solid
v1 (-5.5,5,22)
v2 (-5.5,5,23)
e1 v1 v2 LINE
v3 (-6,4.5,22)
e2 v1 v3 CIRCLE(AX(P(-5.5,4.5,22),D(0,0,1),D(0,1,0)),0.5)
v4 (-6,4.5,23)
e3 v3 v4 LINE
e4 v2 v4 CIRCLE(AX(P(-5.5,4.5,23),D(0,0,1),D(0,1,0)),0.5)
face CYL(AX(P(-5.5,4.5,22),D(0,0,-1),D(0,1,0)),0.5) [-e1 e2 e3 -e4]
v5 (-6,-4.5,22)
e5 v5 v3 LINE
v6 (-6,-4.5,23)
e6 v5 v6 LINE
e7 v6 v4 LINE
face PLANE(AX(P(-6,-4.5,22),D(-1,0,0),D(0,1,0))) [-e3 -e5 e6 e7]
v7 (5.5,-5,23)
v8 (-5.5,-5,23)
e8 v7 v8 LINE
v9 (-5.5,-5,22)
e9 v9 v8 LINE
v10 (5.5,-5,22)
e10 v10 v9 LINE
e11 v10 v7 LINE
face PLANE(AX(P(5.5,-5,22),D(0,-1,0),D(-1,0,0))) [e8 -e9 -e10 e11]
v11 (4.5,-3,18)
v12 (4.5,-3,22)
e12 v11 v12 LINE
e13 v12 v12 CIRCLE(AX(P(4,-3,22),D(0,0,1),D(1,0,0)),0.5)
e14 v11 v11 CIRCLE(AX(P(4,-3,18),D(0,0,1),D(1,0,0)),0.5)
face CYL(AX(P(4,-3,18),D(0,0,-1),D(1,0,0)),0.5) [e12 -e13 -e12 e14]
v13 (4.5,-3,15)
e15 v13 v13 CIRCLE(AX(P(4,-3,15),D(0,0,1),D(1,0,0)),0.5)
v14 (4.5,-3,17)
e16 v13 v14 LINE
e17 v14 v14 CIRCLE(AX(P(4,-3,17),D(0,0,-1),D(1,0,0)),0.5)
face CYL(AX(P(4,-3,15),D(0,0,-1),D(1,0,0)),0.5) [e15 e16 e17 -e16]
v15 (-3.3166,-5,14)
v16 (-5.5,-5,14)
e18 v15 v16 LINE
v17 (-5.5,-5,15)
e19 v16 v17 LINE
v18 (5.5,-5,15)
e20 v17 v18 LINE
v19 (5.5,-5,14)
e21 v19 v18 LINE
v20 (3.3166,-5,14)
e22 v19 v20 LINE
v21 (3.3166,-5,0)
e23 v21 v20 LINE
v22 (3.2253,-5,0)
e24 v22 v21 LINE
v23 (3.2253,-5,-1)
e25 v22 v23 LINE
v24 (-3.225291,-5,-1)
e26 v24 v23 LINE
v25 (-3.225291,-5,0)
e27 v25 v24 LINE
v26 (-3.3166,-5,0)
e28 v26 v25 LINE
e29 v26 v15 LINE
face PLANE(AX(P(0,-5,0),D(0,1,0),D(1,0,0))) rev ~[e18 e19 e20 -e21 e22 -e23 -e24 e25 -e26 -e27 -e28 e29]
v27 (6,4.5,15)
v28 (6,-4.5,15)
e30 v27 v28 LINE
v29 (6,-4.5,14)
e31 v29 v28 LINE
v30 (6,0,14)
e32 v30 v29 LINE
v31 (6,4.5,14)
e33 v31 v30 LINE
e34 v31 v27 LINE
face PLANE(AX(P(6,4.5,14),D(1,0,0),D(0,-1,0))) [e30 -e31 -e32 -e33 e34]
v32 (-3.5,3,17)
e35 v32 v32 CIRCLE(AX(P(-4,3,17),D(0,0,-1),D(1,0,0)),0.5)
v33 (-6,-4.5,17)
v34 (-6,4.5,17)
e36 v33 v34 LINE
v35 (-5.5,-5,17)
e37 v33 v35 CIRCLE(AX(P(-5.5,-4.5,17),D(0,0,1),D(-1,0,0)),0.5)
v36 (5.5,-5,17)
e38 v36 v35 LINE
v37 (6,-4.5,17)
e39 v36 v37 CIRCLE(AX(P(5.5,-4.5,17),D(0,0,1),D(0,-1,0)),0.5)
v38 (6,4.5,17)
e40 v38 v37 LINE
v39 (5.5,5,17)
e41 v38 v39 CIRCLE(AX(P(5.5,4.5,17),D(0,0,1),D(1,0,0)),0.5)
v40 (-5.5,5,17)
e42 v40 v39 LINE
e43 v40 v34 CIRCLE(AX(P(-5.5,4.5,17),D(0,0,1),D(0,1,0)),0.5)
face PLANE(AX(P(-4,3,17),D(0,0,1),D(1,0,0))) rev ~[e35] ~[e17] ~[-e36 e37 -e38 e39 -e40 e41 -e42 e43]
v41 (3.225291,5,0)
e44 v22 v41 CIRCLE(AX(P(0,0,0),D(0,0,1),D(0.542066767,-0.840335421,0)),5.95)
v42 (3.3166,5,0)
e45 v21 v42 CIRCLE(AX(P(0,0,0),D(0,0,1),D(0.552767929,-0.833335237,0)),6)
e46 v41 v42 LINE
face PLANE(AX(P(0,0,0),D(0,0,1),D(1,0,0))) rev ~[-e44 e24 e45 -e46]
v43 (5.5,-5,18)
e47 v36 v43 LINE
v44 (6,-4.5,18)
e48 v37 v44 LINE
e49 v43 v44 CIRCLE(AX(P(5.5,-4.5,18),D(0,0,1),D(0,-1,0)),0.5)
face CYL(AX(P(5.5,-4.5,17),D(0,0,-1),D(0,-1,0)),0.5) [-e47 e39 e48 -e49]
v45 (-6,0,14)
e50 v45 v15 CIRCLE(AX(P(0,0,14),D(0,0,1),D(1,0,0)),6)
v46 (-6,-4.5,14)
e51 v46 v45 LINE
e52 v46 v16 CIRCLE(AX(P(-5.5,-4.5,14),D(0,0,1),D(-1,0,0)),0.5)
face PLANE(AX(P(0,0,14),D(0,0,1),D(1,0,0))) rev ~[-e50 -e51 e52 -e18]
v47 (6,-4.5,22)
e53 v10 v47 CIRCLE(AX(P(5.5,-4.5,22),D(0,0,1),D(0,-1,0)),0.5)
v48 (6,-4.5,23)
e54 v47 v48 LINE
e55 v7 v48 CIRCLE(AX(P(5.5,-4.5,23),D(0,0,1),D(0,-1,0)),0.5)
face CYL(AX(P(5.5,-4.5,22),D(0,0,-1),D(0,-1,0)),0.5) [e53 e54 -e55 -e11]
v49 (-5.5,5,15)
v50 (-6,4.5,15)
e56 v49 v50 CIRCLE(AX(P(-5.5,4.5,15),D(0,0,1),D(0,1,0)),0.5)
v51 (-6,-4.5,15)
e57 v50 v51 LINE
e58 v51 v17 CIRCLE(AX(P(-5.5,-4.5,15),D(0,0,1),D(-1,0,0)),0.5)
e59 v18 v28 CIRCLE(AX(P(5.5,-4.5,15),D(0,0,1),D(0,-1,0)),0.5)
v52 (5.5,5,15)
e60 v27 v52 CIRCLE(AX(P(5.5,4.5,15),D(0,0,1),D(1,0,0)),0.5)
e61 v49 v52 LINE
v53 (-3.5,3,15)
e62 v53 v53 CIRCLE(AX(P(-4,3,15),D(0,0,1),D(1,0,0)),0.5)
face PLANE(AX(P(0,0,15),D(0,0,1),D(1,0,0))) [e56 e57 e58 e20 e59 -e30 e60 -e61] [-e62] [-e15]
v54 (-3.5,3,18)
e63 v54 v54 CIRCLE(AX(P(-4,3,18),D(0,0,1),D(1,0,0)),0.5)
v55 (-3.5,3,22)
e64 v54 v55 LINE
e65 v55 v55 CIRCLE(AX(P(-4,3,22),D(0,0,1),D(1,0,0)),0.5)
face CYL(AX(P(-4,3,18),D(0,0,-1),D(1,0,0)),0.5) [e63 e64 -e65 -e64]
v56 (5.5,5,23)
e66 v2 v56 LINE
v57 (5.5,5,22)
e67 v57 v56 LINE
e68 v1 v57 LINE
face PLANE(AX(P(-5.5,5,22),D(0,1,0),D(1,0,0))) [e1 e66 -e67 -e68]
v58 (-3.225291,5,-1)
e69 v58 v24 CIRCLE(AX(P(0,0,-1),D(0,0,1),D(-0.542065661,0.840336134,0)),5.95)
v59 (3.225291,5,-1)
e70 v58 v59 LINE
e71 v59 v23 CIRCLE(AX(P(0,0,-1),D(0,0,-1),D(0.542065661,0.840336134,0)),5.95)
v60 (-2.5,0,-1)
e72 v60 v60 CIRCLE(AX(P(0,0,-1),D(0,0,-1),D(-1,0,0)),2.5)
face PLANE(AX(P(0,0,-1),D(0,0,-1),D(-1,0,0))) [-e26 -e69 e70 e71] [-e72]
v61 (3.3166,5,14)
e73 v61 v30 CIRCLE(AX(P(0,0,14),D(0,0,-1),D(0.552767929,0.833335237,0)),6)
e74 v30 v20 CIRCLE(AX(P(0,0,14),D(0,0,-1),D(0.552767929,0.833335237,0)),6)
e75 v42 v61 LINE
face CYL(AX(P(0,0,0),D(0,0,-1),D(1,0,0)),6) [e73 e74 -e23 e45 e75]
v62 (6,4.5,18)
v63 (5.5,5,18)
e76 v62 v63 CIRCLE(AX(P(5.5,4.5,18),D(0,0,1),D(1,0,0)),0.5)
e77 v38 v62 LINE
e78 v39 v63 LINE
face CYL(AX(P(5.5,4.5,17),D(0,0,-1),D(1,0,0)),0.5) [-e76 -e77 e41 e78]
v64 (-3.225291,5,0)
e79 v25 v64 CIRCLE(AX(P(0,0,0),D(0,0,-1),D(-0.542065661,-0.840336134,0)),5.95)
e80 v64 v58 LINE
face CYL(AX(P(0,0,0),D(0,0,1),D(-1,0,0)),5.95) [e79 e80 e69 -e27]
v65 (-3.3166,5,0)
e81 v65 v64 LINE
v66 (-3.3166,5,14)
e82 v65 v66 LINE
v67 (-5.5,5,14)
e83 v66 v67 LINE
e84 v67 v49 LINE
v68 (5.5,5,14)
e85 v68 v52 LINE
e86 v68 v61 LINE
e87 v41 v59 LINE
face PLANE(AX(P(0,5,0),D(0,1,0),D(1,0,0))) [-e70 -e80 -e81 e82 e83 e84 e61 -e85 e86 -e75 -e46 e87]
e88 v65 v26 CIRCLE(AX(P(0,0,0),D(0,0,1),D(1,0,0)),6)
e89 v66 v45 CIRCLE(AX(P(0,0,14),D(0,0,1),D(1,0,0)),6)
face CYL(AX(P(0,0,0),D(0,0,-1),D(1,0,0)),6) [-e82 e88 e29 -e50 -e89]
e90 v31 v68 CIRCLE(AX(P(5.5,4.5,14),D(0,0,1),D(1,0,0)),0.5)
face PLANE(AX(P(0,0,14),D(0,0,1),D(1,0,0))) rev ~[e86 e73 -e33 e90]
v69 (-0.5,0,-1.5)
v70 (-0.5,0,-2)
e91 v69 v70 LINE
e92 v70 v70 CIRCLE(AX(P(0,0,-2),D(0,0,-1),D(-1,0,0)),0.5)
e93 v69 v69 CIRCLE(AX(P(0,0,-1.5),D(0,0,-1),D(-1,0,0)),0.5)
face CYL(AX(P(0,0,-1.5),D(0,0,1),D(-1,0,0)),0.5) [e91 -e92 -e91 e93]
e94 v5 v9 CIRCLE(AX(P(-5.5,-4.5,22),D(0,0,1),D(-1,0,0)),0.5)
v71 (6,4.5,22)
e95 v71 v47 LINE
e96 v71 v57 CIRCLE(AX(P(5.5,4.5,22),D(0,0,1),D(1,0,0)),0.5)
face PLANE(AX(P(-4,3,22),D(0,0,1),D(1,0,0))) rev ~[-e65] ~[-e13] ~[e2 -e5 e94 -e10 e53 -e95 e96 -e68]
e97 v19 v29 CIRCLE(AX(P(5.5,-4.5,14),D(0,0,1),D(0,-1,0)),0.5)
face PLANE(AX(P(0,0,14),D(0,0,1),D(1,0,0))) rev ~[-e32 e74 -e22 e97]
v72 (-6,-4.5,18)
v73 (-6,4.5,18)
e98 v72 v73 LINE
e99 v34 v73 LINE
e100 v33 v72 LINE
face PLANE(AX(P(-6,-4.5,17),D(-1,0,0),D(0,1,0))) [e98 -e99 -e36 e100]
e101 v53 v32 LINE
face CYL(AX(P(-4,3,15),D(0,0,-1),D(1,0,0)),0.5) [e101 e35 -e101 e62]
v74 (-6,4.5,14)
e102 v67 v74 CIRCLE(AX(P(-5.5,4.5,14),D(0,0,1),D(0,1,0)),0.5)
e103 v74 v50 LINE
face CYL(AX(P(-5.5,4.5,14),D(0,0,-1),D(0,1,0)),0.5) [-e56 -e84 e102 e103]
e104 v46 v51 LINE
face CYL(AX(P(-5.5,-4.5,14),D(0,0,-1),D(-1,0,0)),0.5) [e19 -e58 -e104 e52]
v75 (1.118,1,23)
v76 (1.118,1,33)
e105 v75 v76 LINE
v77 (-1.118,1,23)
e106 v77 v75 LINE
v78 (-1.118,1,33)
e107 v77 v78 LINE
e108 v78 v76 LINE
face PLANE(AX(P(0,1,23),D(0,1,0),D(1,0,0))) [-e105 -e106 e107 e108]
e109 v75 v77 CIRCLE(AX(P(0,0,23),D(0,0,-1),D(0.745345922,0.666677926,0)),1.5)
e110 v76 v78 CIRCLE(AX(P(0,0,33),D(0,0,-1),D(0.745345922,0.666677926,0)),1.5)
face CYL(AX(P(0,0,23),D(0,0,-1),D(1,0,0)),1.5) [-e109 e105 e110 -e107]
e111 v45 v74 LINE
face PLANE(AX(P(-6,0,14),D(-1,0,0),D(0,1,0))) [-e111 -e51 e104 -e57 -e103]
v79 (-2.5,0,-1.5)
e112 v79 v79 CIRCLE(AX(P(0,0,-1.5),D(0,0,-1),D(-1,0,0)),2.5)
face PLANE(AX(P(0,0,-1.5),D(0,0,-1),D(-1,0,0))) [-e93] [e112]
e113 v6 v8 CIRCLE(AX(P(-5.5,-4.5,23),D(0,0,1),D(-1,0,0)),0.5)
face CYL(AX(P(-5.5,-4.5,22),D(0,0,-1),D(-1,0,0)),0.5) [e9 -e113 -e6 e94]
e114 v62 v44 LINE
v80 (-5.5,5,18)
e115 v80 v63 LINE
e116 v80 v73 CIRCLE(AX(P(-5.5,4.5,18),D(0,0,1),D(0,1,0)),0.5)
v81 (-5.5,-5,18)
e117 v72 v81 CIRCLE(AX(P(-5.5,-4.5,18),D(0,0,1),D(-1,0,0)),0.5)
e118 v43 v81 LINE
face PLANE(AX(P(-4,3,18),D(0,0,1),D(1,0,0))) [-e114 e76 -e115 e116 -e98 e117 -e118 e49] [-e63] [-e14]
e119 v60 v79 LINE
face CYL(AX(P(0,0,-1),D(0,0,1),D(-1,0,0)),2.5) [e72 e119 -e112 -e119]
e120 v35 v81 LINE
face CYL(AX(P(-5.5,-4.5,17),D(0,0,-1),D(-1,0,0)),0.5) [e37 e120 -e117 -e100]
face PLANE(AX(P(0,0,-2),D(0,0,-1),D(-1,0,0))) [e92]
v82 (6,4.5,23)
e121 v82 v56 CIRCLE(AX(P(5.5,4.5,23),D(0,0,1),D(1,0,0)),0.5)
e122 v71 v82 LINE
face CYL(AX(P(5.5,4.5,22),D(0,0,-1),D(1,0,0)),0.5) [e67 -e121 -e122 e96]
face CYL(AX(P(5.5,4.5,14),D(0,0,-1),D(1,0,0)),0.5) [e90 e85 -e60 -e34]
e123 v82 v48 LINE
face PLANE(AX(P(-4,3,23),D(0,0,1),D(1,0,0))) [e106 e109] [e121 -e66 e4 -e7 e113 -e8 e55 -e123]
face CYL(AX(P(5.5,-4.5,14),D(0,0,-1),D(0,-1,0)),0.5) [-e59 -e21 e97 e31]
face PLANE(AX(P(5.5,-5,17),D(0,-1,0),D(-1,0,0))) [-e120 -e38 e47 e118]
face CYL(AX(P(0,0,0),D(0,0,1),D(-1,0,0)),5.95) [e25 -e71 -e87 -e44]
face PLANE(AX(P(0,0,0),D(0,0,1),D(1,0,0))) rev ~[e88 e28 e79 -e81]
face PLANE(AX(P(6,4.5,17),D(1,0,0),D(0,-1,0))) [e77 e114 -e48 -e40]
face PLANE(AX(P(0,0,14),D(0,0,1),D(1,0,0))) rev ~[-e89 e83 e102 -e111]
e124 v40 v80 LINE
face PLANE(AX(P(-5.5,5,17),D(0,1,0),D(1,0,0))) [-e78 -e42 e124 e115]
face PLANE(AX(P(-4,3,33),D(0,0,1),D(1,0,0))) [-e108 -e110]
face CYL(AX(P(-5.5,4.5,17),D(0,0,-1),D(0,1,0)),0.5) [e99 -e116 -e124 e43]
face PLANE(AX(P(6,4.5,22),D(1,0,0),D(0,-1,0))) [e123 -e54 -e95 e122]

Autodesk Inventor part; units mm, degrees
ref_plane "YZ Plane" through (0, 0, 0) normal (1, 0, 0) x (0, 1, 0)
ref_plane "XZ Plane" through (0, 0, 0) normal (0, 1, 0) x (-1, 0, 0)
ref_plane "XY Plane" through (0, 0, 0) normal (0, 0, 1) x (1, 0, 0)
sketch "Sketch1" plane through (0, 0, 0) normal (0, 0, 1) x (1, 0, 0)
  circle A0 centre (0, 0) radius 6
  line L0 (0, 0) -> (0, 5)
  line L1 (0, 5) -> (3.3166, 5)
  line L2 (0, 5) -> (-3.3166, 5)
  line L3 (0, 0) -> (0, -5)
  line L4 (0, -5) -> (3.3166, -5)
  line L5 (0, -5) -> (-3.3166, -5)
  dimension "d0" = 12
  dimension "d1" = 5
  dimension "d2" = 5
extrude "Extrusion1" add sketch "Sketch1" along normal blind 14 contours A0 L4 L3 L0 L1 | L2 L0 L3 L5 A0
sketch "Sketch2" plane through (0, 0, 14) normal (0, 0, 1) x (1, 0, 0)
  arc A0 (-3.3166, 5) -> (-3.3166, -5) centre (0, 0) ccw projected
  line L0 (-6, 0) -> (-6, 4.5)
  line L1 (-5.5, 5) -> (5.5, 5)
  line L2 (6, 4.5) -> (6, -4.5)
  line L3 (5.5, -5) -> (-5.5, -5)
  line L4 (-6, -4.5) -> (-6, 5)
  arc A1 (-5.5, 5) -> (-6, 4.5) centre (-5.5, 4.5) ccw
  arc A2 (-6, -4.5) -> (-5.5, -5) centre (-5.5, -4.5) ccw
  arc A3 (5.5, -5) -> (6, -4.5) centre (5.5, -4.5) ccw
  arc A4 (6, 4.5) -> (5.5, 5) centre (5.5, 4.5) ccw
  point P0 (6, -5)
  point P1 (-6, -5)
  dimension "d5" = 12
  dimension "d6" = 0.5
  dimension "d32" = 10
  dimension "d33" = 5
extrude "Extrusion2" add sketch "Sketch2" along normal blind 1
sketch "Sketch3" plane through (0, 0, 15) normal (0, 0, 1) x (1, 0, 0)
  line L0 (0, 0) -> (-4, 0)
  line L1 (-4, 0) -> (-4, 3)
  line L2 (0, 0) -> (0, -3)
  line L3 (0, -3) -> (4, -3)
  circle A0 centre (-4, 3) radius 0.5
  circle A1 centre (4, -3) radius 0.5
  dimension "d9" = 4
  dimension "d10" = 3
  dimension "d11" = 3
  dimension "d12" = 4
  dimension "d13" = 1
  dimension "d14" = 1
extrude "Extrusion3" add sketch "Sketch3" along normal blind 2
sketch "Sketch4" plane through (-4, 3, 17) normal (0, 0, 1) x (1, 0, 0)
  line L0 (-1.5, 2) -> (9.5, 2)
  line L1 (10, 1.5) -> (10, -7.5)
  line L2 (9.5, -8) -> (-1.5, -8)
  line L3 (-2, -7.5) -> (-2, 1.5)
  arc A0 (-1.5, 2) -> (-2, 1.5) centre (-1.5, 1.5) ccw
  arc A1 (-2, -7.5) -> (-1.5, -8) centre (-1.5, -7.5) ccw
  arc A2 (9.5, -8) -> (10, -7.5) centre (9.5, -7.5) ccw
  arc A3 (10, 1.5) -> (9.5, 2) centre (9.5, 1.5) ccw
  line L4 (-1.5, -8) -> (9.5, -8) projected
  line L5 (-2, 1.5) -> (-2, -7.5) projected
  point P0 (4, -3)
  dimension "d17" = 0.5
  dimension "d36" = 10
  dimension "d37" = 12
  dimension "d38" = 0
  dimension "d39" = 0
extrude "Extrusion4" add sketch "Sketch4" along normal blind 1
sketch "Sketch5" plane through (-4, 3, 18) normal (0, 0, 1) x (1, 0, 0)
  circle A0 centre (0, 0) radius 0.5 projected
  circle A1 centre (0, 0) radius 0.5
  circle A2 centre (8, -6) radius 0.5 projected
  circle A3 centre (8, -6) radius 0.5
  point P0 (4, -3)
  point P1 (7.9, -5.5101)
  point P2 (7.9, -6.4899)
extrude "Extrusion5" add sketch "Sketch5" along normal blind 4
sketch "Sketch6" plane through (-4, 3, 22) normal (0, 0, 1) x (1, 0, 0)
  line L0 (-1.5, 2) -> (9.5, 2)
  line L1 (10, 1.5) -> (10, -7.5)
  line L2 (9.5, -8) -> (-1.5, -8)
  line L3 (-2, -7.5) -> (-2, 1.5)
  arc A0 (-1.5, 2) -> (-2, 1.5) centre (-1.5, 1.5) ccw
  arc A1 (10, 1.5) -> (9.5, 2) centre (9.5, 1.5) ccw
  arc A2 (9.5, -8) -> (10, -7.5) centre (9.5, -7.5) ccw
  arc A3 (-2, -7.5) -> (-1.5, -8) centre (-1.5, -7.5) ccw
  line L4 (-1.5, -8) -> (9.5, -8) projected
  line L5 (-2, 1.5) -> (-2, -7.5) projected
  point P0 (4, -3)
  dimension "d22" = 0.5
  dimension "d40" = 10
  dimension "d41" = 12
  dimension "d42" = 0
  dimension "d43" = 0
extrude "Extrusion6" add sketch "Sketch6" along normal blind 1
sketch "Sketch7" plane through (-4, 3, 23) normal (0, 0, 1) x (1, 0, 0)
  circle A0 centre (4, -3) radius 1.5
  line L0 (4, -3) -> (4, -2)
  line L1 (4, -2) -> (5.118, -2)
  line L2 (4, -2) -> (2.882, -2)
  dimension "d25" = 3
  dimension "d26" = 1
extrude "Extrusion7" add sketch "Sketch7" along normal blind 10 contours A0 L2 L1 picked at (3.9981, -3.6594)
sketch "Sketch8" plane through (0, 0, 0) normal (0, 0, -1) x (-1, 0, 0)
  circle A0 centre (0, 0) radius 5.95
  line L0 (0, 0) -> (0, -5)
  line L1 (3.3166, -5) -> (-3.3166, -5) projected
  line L2 (0, -5) -> (3.3166, -5)
  line L3 (3.3166, -5) -> (-3.2253, -5)
  line L4 (0, 0) -> (0, 5)
  line L5 (-3.3166, 5) -> (3.3166, 5) projected
  line L6 (3.289, 4.9583) -> (-3.289, 4.9583)
  point P0 (-3.2253, -5)
  point P1 (3.2253, -5)
  point P2 (3.2253, 5)
  point P3 (-3.2253, 5)
  dimension "d35" = 11.9
  dimension "d34" = 5
extrude "Extrusion8" add sketch "Sketch8" along normal blind 1 contours A0 L1 L0 L4 L6 | L6 L4 L5 A0 | L6 A0 L5 L4 | L4 L0 L1 A0 L6
sketch "Sketch9" plane through (0, 0, -1) normal (0, 0, -1) x (-1, 0, 0)
  arc A0 (-1.118, 1) -> (1.118, 1) centre (0, 0) ccw projected
  circle A1 centre (0, 0) radius 2.5
  dimension "d44" = 5
extrude "Extrusion9" add sketch "Sketch9" along normal blind 0.5
sketch "Sketch10" plane through (0, 0, -1.5) normal (0, 0, -1) x (-1, 0, 0)
  circle A0 centre (0, 0) radius 0.5
  dimension "d47" = 1
extrude "Extrusion10" add sketch "Sketch10" along normal blind 0.5
properties part number "minimotor"
